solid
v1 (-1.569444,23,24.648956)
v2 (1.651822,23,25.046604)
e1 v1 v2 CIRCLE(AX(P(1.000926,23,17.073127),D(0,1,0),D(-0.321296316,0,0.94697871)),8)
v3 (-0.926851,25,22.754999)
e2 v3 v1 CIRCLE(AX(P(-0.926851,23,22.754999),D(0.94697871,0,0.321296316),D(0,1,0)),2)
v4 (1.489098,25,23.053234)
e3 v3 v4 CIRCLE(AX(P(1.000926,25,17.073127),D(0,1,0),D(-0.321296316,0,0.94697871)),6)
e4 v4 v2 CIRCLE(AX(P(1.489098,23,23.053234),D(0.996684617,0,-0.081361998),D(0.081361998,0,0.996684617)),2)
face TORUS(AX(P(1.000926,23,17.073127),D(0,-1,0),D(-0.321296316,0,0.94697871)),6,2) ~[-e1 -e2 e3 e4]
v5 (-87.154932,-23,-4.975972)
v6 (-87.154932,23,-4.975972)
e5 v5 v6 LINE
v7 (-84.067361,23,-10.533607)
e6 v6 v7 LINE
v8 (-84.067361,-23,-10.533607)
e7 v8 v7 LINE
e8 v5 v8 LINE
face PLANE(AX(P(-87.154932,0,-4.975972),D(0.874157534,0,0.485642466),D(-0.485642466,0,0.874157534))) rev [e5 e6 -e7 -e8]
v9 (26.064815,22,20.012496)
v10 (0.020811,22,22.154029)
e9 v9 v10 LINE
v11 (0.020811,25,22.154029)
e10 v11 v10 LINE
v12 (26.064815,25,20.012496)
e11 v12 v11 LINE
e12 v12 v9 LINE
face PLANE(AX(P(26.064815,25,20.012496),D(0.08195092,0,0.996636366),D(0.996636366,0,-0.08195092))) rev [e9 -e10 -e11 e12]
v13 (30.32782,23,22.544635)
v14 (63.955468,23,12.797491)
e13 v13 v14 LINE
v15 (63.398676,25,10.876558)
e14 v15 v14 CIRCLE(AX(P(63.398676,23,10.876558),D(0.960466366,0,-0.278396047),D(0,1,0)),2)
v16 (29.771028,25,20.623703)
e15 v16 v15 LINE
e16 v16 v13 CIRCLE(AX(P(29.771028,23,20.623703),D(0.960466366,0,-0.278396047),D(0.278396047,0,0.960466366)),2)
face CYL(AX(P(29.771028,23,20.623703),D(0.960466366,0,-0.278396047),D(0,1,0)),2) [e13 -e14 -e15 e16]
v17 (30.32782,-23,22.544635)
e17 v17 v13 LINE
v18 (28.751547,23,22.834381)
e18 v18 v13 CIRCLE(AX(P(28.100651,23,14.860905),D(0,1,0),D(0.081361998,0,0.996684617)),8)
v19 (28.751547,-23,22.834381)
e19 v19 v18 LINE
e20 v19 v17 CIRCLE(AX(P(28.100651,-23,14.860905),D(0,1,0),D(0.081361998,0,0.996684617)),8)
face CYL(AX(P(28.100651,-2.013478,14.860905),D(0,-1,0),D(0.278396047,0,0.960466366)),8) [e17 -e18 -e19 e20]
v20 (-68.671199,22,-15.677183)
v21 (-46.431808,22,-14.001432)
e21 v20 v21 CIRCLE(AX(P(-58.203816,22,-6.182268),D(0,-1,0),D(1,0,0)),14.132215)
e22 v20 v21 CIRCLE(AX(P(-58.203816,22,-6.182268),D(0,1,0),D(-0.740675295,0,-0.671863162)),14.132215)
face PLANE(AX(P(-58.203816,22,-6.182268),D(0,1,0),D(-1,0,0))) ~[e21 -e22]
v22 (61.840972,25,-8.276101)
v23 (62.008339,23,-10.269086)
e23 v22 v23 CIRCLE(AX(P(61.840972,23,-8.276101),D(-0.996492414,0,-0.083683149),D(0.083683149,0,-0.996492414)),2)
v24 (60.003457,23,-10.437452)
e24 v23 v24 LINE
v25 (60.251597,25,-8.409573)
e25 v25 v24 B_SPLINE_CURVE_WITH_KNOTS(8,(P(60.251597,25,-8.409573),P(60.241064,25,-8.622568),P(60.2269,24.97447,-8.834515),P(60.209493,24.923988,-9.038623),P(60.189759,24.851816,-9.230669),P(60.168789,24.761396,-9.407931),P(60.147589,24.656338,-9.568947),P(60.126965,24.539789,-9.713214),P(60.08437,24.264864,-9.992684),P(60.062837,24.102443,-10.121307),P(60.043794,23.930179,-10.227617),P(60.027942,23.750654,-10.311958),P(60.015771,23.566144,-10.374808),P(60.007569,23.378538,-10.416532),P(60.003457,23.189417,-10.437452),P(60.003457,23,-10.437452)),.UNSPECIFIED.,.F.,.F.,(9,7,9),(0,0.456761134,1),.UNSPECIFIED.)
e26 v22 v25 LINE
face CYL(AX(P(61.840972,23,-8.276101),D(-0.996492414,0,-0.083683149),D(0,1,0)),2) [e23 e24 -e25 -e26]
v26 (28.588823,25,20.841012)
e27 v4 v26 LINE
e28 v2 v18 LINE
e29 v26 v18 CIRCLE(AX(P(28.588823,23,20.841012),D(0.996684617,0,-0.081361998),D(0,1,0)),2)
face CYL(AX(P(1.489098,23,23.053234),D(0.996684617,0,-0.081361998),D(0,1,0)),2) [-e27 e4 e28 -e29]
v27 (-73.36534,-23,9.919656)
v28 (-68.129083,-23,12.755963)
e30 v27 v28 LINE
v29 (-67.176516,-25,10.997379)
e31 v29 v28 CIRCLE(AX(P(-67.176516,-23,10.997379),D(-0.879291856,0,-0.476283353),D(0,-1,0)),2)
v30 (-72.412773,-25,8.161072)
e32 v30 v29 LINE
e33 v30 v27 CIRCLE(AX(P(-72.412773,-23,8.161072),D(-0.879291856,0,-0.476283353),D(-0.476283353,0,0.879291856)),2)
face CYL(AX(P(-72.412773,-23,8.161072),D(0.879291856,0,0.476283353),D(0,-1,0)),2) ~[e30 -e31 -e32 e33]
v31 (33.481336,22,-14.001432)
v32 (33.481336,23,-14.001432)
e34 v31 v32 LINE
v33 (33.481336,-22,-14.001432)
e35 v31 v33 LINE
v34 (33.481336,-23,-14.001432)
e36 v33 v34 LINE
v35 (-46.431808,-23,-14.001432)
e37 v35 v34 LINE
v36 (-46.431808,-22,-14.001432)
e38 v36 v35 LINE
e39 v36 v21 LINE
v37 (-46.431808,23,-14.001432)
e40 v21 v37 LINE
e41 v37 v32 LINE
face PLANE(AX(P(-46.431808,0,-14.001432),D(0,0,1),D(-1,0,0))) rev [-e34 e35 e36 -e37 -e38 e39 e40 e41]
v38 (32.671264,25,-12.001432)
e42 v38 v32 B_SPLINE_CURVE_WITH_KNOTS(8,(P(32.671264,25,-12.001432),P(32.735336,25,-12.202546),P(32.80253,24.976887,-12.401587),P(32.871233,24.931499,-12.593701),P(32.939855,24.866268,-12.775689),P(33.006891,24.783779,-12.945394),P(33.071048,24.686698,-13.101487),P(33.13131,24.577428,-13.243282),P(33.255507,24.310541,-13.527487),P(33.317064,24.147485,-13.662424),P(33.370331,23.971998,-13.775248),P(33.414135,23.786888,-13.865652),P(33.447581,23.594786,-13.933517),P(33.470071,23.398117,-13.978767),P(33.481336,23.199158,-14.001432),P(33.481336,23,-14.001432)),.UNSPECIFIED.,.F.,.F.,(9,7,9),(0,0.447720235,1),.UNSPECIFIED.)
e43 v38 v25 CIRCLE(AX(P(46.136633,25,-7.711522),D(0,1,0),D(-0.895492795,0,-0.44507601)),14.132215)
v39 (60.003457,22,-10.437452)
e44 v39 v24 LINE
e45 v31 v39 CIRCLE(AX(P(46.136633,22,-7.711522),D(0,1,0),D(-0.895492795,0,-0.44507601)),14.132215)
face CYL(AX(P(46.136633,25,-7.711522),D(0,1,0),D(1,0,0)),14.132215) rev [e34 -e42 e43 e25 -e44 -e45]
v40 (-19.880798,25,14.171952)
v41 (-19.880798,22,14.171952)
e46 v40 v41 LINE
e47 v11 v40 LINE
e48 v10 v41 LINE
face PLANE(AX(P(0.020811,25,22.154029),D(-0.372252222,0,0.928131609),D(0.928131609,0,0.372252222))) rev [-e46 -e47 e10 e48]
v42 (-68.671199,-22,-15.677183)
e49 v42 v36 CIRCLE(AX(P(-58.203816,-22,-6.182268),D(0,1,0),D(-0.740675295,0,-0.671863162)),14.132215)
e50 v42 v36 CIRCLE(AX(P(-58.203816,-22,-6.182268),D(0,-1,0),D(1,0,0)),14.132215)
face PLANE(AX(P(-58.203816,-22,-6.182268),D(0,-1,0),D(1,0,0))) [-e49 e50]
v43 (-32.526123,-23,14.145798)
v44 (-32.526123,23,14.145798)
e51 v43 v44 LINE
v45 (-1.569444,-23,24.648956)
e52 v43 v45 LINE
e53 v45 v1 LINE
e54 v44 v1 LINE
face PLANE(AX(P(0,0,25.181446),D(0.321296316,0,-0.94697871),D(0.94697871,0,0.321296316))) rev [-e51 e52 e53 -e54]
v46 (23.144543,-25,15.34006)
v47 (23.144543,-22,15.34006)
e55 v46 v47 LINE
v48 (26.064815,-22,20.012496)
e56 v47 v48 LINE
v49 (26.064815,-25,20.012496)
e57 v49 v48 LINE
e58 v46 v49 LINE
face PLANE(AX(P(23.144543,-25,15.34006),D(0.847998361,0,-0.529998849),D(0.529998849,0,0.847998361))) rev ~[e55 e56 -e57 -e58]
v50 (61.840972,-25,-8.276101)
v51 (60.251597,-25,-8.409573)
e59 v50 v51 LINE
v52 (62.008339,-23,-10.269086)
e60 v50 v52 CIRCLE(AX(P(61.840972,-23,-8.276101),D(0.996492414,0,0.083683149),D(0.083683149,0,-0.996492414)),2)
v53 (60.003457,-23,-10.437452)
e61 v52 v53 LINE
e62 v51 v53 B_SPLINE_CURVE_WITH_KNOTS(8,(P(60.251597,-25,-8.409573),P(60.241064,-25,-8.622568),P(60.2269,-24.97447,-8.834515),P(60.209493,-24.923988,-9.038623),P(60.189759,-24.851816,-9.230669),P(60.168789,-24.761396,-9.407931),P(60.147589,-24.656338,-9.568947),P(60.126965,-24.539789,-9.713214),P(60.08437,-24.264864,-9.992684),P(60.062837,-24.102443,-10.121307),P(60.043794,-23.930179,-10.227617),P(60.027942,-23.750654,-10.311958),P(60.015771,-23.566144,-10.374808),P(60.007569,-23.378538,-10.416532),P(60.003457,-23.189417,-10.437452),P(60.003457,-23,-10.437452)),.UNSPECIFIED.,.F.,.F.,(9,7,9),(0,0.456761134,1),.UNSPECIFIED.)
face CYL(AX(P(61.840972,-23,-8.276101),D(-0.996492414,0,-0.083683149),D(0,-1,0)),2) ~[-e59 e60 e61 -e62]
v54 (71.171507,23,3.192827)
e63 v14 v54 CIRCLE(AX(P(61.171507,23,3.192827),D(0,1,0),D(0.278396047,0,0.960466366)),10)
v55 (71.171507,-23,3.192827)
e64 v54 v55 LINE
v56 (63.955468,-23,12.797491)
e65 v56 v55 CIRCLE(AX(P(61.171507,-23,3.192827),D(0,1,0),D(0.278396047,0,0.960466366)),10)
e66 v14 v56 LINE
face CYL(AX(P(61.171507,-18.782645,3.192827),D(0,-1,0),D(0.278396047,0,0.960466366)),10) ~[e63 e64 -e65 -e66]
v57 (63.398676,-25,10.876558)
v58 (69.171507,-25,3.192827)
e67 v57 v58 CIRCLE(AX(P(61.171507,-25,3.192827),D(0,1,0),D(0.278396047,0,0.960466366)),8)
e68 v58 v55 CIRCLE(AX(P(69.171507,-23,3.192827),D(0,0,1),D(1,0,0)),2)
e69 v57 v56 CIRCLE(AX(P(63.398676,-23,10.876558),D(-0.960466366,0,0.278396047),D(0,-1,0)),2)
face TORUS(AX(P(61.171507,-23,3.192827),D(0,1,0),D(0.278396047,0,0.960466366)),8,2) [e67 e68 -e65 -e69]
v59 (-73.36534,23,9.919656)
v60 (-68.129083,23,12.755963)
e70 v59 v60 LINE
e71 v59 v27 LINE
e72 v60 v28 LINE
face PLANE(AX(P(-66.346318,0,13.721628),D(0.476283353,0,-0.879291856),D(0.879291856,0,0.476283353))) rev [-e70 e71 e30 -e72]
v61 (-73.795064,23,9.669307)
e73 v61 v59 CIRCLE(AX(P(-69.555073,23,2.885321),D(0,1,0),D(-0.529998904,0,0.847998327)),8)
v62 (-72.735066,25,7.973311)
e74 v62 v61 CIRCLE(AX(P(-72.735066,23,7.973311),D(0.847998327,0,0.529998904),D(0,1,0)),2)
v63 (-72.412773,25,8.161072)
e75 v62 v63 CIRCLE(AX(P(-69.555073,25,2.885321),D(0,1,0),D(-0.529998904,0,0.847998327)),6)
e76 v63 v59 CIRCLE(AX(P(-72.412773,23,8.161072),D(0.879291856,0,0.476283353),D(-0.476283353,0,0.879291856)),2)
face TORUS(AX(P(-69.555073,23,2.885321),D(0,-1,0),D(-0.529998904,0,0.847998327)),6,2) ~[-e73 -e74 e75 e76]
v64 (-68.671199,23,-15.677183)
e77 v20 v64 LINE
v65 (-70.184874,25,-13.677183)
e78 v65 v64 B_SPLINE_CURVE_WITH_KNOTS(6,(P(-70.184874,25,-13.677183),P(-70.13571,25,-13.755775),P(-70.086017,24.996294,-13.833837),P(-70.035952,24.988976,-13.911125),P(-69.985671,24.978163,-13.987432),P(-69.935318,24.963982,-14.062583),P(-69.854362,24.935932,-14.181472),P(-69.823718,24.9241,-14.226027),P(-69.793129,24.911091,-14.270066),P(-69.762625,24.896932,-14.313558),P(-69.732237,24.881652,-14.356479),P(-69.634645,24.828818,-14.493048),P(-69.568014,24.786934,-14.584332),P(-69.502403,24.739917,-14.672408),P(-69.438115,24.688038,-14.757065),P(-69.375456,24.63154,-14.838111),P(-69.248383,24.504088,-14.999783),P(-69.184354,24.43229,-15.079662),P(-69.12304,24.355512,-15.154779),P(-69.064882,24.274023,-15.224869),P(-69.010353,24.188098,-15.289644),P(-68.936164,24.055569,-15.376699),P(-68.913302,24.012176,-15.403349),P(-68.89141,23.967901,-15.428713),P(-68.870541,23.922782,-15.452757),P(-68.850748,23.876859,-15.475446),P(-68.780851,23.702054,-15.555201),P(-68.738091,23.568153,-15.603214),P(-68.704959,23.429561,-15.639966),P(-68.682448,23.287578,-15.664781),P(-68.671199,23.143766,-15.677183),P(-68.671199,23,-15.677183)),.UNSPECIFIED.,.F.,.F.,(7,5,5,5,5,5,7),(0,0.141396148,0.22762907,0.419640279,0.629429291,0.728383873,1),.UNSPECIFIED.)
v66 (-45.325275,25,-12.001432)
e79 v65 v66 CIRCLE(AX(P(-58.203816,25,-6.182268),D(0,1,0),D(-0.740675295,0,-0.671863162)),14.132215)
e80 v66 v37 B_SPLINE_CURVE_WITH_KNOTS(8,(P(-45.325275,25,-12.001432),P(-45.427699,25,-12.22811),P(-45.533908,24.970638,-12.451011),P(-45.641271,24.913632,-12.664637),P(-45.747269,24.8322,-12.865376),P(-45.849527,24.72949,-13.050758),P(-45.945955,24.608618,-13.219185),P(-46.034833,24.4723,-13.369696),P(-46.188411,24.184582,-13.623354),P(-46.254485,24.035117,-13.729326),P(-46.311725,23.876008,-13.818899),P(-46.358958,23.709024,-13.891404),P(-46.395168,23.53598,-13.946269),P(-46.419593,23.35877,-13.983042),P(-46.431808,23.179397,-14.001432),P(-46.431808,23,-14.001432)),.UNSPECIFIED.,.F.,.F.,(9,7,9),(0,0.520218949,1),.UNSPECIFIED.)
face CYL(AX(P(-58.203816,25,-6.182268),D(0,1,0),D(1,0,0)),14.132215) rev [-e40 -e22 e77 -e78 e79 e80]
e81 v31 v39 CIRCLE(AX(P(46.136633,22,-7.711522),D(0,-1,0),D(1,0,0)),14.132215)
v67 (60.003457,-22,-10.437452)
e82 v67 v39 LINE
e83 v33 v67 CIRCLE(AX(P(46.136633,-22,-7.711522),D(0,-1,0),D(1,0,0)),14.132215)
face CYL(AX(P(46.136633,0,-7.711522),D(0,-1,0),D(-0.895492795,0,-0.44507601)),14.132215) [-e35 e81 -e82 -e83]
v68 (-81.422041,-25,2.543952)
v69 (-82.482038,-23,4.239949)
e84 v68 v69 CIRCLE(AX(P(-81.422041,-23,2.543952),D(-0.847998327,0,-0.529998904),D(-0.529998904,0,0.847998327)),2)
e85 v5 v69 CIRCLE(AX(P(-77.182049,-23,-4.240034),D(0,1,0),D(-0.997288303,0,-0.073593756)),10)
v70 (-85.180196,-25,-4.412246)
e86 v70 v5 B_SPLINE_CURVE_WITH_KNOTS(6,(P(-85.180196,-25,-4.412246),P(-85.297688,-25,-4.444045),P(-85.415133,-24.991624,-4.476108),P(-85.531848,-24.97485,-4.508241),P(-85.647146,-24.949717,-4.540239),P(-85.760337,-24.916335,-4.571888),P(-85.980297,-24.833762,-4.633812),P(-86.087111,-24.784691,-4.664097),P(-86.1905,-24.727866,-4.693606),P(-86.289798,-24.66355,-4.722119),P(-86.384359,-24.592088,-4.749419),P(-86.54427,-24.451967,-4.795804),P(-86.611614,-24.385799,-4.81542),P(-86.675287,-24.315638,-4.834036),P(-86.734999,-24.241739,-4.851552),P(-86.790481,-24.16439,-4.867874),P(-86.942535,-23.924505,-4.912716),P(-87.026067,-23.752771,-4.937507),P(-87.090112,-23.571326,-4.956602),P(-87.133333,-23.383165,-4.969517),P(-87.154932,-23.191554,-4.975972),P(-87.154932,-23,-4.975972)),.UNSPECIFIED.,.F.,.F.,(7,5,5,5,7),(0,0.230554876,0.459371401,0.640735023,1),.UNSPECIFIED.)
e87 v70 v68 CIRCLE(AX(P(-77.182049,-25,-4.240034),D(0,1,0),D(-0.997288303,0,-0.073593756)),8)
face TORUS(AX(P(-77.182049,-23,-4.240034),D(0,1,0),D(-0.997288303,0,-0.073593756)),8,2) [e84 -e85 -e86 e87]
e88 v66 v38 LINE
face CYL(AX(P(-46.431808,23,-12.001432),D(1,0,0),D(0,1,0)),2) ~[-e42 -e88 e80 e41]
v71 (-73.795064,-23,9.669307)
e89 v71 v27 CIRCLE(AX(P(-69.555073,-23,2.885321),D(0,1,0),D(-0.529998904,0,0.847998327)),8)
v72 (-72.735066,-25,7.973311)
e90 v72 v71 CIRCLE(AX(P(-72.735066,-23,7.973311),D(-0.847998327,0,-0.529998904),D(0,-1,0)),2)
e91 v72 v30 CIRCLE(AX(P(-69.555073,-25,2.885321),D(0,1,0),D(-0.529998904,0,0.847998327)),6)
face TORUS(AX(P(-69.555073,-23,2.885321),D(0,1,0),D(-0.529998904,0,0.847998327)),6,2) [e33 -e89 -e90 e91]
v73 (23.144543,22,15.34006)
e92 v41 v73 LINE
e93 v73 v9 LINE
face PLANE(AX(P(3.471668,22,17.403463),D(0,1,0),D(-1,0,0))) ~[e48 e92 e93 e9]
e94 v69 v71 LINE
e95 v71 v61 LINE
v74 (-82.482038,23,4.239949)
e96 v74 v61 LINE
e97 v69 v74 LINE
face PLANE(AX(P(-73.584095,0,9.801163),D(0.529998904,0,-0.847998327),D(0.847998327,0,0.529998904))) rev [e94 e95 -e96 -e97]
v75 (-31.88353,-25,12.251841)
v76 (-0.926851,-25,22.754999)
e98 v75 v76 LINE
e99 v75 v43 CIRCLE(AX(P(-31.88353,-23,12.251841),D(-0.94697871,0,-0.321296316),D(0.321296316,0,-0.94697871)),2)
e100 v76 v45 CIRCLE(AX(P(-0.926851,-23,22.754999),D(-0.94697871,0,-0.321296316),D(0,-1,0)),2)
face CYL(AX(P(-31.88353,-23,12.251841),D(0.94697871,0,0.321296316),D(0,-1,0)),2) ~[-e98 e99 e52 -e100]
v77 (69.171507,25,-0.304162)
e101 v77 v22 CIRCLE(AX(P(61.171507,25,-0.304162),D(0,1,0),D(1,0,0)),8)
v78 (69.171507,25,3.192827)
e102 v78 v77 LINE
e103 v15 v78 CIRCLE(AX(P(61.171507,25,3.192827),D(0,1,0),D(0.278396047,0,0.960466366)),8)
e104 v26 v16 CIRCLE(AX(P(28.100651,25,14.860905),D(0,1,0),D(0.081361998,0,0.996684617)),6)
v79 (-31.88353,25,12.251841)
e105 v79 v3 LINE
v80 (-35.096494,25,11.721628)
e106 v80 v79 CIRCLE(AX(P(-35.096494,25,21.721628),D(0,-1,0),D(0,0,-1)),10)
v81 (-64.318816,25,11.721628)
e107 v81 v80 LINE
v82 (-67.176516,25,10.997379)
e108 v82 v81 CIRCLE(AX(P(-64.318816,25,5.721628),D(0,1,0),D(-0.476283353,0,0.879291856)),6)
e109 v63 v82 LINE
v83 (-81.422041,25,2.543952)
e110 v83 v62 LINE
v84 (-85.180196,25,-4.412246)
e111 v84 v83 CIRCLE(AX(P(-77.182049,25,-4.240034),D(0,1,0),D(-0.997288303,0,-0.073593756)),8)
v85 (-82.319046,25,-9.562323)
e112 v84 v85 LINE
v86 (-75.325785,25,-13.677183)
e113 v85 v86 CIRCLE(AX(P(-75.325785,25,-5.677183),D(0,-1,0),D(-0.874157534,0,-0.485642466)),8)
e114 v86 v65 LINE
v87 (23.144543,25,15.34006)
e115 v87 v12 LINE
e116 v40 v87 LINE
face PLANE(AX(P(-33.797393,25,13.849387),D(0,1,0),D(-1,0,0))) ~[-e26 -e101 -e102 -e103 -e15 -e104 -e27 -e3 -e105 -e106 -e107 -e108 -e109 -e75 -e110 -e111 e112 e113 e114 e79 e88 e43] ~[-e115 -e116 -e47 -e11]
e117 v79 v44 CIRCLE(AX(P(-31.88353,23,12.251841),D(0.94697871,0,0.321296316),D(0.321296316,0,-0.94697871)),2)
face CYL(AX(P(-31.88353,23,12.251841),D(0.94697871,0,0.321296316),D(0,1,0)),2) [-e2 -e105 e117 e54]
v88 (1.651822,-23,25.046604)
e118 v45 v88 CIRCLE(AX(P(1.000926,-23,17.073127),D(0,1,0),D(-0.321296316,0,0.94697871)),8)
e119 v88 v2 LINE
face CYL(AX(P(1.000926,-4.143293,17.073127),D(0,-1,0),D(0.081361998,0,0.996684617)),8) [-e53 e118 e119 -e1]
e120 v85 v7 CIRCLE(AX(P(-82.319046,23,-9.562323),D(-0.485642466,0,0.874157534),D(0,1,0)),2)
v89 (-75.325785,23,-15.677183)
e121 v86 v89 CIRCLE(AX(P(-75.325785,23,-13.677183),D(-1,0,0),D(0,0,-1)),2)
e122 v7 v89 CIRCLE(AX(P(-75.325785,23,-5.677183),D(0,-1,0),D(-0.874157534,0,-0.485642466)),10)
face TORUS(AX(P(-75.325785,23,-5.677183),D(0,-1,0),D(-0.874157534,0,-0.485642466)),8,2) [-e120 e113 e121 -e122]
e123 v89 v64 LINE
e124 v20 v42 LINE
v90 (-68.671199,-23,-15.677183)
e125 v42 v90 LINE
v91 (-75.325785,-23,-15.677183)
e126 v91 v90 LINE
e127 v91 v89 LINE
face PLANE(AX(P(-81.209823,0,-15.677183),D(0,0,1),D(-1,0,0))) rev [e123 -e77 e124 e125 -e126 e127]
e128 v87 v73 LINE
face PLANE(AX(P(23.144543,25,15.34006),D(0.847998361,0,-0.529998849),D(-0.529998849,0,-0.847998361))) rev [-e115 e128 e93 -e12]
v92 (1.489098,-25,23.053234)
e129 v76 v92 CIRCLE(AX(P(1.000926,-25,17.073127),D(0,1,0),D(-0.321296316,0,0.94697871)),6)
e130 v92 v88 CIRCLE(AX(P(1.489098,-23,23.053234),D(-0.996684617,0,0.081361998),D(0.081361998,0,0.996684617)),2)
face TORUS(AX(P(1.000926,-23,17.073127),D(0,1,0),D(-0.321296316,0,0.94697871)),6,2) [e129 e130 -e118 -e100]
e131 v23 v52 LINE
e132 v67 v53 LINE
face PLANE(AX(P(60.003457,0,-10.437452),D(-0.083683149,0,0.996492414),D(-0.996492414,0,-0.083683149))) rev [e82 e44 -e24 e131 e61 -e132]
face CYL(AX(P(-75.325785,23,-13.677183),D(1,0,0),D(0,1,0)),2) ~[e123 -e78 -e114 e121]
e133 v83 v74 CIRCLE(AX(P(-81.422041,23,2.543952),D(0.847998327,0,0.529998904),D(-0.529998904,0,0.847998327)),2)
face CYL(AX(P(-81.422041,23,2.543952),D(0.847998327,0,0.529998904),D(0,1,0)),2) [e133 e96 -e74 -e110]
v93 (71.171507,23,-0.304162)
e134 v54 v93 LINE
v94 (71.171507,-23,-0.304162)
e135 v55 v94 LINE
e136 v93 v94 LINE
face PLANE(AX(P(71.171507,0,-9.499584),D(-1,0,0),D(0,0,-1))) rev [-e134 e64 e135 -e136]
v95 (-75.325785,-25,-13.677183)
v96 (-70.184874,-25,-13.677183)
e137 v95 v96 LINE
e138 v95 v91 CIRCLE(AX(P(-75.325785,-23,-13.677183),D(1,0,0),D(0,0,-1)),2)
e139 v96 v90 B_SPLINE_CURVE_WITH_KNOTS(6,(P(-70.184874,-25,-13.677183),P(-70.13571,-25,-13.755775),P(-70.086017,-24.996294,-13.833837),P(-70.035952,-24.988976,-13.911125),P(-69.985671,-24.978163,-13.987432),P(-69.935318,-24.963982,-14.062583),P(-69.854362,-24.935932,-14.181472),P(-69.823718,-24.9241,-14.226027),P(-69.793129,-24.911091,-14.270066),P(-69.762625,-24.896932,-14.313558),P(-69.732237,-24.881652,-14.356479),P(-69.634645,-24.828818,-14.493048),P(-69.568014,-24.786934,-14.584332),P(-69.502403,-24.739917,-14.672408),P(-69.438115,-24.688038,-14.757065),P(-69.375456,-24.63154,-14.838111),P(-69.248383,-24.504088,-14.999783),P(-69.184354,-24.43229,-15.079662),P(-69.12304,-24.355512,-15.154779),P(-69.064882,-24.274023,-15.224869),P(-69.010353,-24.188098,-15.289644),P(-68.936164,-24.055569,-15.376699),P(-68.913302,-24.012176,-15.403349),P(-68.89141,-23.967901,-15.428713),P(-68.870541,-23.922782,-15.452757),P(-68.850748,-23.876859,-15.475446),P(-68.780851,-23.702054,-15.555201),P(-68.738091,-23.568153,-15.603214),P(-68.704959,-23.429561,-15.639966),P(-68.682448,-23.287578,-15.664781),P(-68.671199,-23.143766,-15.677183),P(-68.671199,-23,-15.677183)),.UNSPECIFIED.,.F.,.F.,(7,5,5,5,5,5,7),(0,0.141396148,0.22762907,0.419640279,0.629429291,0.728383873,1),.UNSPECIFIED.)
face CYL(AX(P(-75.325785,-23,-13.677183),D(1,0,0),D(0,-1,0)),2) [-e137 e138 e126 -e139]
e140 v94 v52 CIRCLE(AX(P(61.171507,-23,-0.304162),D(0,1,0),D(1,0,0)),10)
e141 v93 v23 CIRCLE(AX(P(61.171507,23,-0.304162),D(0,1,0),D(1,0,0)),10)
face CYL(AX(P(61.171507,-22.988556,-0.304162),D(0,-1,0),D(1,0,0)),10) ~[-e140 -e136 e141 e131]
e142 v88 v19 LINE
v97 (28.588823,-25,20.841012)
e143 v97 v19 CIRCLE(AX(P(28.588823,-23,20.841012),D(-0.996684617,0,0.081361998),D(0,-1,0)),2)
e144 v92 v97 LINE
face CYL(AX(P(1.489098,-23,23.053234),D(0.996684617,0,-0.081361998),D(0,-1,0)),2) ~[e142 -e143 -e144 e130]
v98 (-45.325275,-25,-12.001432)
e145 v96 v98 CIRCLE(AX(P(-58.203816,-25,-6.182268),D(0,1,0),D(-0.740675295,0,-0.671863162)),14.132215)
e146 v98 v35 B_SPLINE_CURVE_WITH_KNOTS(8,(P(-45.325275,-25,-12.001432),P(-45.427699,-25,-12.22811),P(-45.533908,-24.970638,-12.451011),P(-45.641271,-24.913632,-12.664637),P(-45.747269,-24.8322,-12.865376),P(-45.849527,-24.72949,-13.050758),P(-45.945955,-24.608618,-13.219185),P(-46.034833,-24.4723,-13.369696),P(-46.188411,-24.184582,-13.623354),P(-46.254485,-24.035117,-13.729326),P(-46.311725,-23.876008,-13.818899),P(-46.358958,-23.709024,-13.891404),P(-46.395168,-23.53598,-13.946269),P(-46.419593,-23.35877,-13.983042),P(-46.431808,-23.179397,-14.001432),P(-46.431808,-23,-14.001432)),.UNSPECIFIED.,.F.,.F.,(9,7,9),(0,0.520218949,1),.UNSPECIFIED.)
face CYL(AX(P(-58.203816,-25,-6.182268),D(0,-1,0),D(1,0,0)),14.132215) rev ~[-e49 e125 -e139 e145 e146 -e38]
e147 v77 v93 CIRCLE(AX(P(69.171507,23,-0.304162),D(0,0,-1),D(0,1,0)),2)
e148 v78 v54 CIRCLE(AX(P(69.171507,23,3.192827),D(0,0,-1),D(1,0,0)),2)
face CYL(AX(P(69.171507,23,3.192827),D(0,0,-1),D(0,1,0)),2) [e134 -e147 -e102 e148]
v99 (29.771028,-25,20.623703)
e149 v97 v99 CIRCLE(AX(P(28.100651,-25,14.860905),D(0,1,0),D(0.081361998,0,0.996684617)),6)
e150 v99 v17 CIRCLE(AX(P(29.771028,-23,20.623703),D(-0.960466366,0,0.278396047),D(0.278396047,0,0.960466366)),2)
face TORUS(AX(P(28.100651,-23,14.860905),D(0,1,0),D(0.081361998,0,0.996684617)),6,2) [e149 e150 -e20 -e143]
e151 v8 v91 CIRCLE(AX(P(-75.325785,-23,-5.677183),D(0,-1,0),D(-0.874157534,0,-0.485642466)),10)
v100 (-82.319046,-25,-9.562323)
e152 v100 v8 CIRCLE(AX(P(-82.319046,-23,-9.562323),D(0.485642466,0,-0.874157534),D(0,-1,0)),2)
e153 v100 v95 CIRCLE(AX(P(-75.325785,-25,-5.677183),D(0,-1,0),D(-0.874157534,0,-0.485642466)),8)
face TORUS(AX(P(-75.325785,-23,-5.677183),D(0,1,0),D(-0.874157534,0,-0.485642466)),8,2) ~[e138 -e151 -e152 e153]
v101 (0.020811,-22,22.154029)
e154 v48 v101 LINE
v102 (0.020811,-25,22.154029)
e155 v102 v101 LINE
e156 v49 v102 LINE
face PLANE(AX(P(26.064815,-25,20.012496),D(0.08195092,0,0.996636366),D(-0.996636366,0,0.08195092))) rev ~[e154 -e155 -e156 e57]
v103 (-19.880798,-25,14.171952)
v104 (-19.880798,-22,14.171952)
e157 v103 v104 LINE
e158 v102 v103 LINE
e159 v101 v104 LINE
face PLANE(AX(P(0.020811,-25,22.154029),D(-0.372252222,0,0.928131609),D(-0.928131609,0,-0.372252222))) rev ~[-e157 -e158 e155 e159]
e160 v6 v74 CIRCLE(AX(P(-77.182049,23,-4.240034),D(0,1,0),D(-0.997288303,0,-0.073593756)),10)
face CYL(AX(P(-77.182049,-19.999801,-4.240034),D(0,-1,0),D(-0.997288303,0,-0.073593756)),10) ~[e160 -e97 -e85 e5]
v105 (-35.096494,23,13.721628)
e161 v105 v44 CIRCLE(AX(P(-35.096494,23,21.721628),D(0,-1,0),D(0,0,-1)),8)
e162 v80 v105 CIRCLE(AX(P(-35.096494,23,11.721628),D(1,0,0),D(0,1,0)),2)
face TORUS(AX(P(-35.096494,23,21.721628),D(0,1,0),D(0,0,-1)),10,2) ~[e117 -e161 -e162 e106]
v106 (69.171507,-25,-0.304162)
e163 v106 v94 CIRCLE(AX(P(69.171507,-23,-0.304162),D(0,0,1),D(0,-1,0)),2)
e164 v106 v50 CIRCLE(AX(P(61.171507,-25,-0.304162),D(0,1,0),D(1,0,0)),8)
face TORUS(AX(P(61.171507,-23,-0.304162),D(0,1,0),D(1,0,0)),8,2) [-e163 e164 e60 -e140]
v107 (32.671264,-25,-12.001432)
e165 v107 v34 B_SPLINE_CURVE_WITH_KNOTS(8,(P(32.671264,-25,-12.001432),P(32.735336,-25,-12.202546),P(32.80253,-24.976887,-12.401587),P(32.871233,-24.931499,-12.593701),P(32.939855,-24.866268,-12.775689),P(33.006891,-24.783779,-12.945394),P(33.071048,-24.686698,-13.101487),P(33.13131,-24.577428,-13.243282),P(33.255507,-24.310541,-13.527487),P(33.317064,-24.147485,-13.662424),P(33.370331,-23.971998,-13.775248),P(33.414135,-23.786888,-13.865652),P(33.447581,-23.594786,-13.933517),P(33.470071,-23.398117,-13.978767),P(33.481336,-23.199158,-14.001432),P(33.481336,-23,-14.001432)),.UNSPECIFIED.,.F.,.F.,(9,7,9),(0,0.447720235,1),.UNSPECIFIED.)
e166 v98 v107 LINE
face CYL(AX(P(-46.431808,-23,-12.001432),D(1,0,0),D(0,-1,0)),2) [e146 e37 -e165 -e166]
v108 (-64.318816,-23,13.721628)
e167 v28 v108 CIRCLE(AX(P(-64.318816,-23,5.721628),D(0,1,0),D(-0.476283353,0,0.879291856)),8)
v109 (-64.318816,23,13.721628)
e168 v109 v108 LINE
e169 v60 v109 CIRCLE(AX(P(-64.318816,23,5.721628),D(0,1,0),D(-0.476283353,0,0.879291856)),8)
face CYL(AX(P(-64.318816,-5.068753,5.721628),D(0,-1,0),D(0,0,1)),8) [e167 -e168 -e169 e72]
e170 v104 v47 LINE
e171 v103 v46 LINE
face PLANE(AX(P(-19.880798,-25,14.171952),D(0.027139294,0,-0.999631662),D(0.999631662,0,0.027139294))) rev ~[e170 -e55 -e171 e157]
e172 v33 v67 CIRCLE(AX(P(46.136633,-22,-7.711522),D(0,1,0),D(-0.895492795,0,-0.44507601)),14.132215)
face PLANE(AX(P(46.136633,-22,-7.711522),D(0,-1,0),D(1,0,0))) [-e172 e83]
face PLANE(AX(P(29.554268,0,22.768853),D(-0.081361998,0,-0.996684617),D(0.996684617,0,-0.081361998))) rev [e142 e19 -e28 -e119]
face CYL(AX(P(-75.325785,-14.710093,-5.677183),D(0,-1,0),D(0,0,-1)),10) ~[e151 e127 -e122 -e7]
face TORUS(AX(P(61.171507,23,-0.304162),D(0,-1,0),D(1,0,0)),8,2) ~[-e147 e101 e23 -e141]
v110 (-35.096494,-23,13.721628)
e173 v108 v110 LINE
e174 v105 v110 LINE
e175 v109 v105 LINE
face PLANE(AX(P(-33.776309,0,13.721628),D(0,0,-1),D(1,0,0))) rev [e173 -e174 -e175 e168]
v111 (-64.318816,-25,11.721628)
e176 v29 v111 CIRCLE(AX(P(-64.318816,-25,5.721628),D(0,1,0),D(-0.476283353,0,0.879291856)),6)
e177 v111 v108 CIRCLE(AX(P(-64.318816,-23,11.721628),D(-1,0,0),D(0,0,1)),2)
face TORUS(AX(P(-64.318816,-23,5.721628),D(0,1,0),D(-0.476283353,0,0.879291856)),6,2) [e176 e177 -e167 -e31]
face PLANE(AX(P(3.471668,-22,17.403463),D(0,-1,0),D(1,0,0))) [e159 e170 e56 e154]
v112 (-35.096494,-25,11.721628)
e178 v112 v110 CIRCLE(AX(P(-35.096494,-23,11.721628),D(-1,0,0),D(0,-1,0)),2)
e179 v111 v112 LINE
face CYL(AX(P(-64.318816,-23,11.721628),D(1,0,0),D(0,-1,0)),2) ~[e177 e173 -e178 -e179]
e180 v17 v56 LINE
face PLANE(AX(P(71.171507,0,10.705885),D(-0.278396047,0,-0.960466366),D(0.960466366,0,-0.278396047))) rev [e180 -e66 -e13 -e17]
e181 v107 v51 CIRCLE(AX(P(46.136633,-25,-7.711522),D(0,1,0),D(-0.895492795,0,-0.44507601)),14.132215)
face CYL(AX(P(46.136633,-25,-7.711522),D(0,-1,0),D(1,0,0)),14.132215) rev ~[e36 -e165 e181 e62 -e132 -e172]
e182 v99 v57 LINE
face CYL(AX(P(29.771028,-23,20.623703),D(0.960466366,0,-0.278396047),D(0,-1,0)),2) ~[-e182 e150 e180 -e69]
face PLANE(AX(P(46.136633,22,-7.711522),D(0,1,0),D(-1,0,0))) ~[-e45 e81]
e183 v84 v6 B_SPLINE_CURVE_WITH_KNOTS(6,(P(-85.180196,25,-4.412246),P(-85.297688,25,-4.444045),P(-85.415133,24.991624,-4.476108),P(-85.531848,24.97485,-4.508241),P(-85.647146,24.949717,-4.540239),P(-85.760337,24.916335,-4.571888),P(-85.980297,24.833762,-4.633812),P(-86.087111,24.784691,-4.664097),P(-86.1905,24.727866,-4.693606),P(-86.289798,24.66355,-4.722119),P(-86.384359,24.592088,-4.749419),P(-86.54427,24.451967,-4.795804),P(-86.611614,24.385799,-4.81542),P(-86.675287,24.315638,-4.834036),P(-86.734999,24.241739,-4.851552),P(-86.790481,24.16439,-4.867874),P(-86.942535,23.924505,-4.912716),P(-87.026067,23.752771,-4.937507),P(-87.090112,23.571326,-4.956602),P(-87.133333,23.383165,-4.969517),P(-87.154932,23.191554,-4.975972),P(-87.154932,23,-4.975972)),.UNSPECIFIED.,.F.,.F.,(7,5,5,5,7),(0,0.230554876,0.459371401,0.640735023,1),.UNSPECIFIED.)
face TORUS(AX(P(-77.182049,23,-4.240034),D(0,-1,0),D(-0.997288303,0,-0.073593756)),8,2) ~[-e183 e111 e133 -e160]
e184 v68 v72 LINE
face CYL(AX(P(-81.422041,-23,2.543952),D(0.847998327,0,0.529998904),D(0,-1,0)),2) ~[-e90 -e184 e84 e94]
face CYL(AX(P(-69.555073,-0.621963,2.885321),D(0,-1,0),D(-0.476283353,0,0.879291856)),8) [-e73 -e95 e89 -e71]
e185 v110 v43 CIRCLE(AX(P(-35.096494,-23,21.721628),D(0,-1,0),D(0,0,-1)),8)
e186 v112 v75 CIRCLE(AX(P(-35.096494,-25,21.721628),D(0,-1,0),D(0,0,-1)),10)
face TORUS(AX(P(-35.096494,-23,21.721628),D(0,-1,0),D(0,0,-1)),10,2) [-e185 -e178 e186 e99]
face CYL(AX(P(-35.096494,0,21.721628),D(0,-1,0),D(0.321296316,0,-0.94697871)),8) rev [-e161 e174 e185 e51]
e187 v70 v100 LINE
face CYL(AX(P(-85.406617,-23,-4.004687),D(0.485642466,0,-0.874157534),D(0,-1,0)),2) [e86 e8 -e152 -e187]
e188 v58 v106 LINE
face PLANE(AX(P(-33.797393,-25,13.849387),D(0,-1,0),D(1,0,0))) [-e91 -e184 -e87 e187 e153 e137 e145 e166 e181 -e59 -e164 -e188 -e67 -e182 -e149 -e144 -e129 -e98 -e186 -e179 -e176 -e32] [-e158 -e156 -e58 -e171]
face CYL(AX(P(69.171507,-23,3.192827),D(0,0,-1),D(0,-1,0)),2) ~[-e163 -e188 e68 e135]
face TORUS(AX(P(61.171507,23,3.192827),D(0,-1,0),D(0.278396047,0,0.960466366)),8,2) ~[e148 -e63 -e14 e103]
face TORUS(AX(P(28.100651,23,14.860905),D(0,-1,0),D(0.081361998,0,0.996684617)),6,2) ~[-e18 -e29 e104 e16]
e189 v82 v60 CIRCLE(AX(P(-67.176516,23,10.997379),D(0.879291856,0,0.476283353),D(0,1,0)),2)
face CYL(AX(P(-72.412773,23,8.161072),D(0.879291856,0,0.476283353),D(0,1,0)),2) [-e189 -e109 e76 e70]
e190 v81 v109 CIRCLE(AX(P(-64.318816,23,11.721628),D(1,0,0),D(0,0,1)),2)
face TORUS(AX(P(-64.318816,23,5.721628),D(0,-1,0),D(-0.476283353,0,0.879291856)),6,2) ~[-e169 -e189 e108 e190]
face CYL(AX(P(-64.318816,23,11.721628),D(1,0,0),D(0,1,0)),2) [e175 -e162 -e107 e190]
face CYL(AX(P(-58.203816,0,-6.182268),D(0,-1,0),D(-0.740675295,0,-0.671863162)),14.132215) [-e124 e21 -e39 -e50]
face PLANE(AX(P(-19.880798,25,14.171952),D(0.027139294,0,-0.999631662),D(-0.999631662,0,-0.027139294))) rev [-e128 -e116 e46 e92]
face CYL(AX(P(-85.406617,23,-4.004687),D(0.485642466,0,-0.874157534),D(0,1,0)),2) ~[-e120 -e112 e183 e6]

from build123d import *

# Parameters (mm, degrees)
F1_DEPTH    = 25
F2_T1_DEPTH = 25
F2_T3_DEPTH = 33.2865856195
F2_T5_DEPTH = 35.1375068729
F2_T7_DEPTH = 26.2439265081
F2_T9_DEPTH = 29.0269565503
F3_T1_DEPTH = 64.9996021944
F3_T3_DEPTH = 54.4201853444
F3_T5_DEPTH = 62.5652900515
F3_T7_DEPTH = 70.9771112235
F4_R        = 14.1322148091
F5_DEPTH    = 3
F6_R        = 2


# Not quite as in the source:
# - a fillet or chamfer that OpenCascade refuses, or shapes differently, is made with other operations: its cross-section is extruded or revolved along the edge and cut away or added


with BuildPart() as f1:
    # F0 (on Front) → F1 (new body)
    with BuildSketch(Plane.XZ):
        with BuildLine():
            Line((-81.2098225326, -15.6771827859), (-68.6711987798, -15.6771827859))
            ThreePointArc((-68.6711987798, -15.6771827859), (-57.1419560716, -20.274533801), (-46.4318082669, -14.0014318744))
            Line((-46.4318082669, -14.0014318744), (33.4813362922, -14.0014318744))
            ThreePointArc((33.4813362922, -14.0014318744), (48.0187694937, -21.717844135), (60.0034566781, -10.4374516171))
            Line((60.0034566781, -10.4374516171), (71.1715072393, -9.4995843247))
            Line((71.1715072393, -9.4995843247), (71.1715072393, 10.7058854774))
            Line((71.1715072393, 10.7058854774), (29.5542683452, 22.7688532323))
            Line((29.5542683452, 22.7688532323), (0, 25.1814462245))
            Line((0, 25.1814462245), (-33.7763093412, 13.7216281146))
            Line((-33.7763093412, 13.7216281146), (-66.3463175297, 13.7216281146))
            Line((-66.3463175297, 13.7216281146), (-73.5840946436, 9.8011633381))
            Line((-73.5840946436, 9.8011633381), (-89.2659574747, 0))
            Line((-89.2659574747, 0), (-87.1549323201, -4.9759717658))
            Line((-87.1549323201, -4.9759717658), (-81.2098225326, -15.6771827859))
        make_face()
    extrude(amount=F1_DEPTH)

    # F2: fillet of radius 8 on 5 edges, made by hand

    # F2_s2 → F2_t1 (join)
    with BuildSketch(Plane.XZ):
        with BuildLine():
            ThreePointArc((-32.5261230106, 14.1457984349), (-33.7939263524, 13.8283829823), (-35.0964935411, 13.7216281146))
            Line((-35.0964935411, 13.7216281146), (-33.7763093412, 13.7216281146))
            Line((-33.7763093412, 13.7216281146), (-32.5261230106, 14.1457984349))
        make_face()
    extrude(amount=F2_T1_DEPTH)

    # F2_s4 → F2_t3 (cut)
    with BuildSketch(Plane.XZ.offset(-4.1432928098)):
        with BuildLine():
            ThreePointArc((1.6518224825, 25.0466035919), (0.0208109602, 25.012860503), (-1.569444032, 24.6489563376))
            Line((-1.569444032, 24.6489563376), (0, 25.1814462245))
            Line((0, 25.1814462245), (1.6518224825, 25.0466035919))
        make_face()
    extrude(amount=F2_T3_DEPTH, mode=Mode.SUBTRACT)

    # F2_s6 → F2_t5 (cut)
    with BuildSketch(Plane.XZ.offset(-5.0687534365)):
        with BuildLine():
            ThreePointArc((-64.3188161551, 13.7216281146), (-66.284181416, 13.4764549593), (-68.1290829763, 12.7559629624))
            Line((-68.1290829763, 12.7559629624), (-66.3463175297, 13.7216281146))
            Line((-66.3463175297, 13.7216281146), (-64.3188161551, 13.7216281146))
        make_face()
    extrude(amount=F2_T5_DEPTH, mode=Mode.SUBTRACT)

    # F2_s8 → F2_t7 (cut)
    with BuildSketch(Plane.XZ.offset(-0.6219632541)):
        with BuildLine():
            ThreePointArc((-73.365339754, 9.9196556357), (-73.5821478307, 9.7978216209), (-73.7950641631, 9.669307401))
            Line((-73.7950641631, 9.669307401), (-73.5840946436, 9.8011633381))
            Line((-73.5840946436, 9.8011633381), (-73.365339754, 9.9196556357))
        make_face()
    extrude(amount=F2_T7_DEPTH, mode=Mode.SUBTRACT)

    # F2_s10 → F2_t9 (cut)
    with BuildSketch(Plane.XZ.offset(-2.0134782752)):
        with BuildLine():
            ThreePointArc((30.3278196103, 22.544635475), (29.5469574945, 22.7290808385), (28.751547216, 22.8343814784))
            Line((28.751547216, 22.8343814784), (29.5542683452, 22.7688532323))
            Line((29.5542683452, 22.7688532323), (30.3278196103, 22.544635475))
        make_face()
    extrude(amount=F2_T9_DEPTH, mode=Mode.SUBTRACT)

    # F3: fillet of radius 10 on 4 edges, made by hand

    # F3_s2 → F3_t1 (cut)
    with BuildSketch(Plane.XZ.offset(-19.9998010972)):
        with BuildLine():
            ThreePointArc((-87.1549323201, -4.9759717658), (-86.1010433194, 0.2823042988), (-82.4820383293, 4.239949063))
            Line((-82.4820383293, 4.239949063), (-89.2659574747, 0))
            Line((-89.2659574747, 0), (-87.1549323201, -4.9759717658))
        make_face()
    extrude(amount=F3_T1_DEPTH, mode=Mode.SUBTRACT)

    # F3_s4 → F3_t3 (cut)
    with BuildSketch(Plane.XZ.offset(-14.7100926722)):
        with BuildLine():
            ThreePointArc((-75.3257854638, -15.6771827859), (-80.3970650538, -14.2958905382), (-84.0673608071, -10.5336074498))
            Line((-84.0673608071, -10.5336074498), (-81.2098225326, -15.6771827859))
            Line((-81.2098225326, -15.6771827859), (-75.3257854638, -15.6771827859))
        make_face()
    extrude(amount=F3_T3_DEPTH, mode=Mode.SUBTRACT)

    # F3_s6 → F3_t5 (cut)
    with BuildSketch(Plane.XZ.offset(-18.7826450258)):
        with BuildLine():
            ThreePointArc((63.9554677121, 12.7974911304), (69.1664933159, 9.1995068855), (71.1715072393, 3.1928274671))
            Line((71.1715072393, 3.1928274671), (71.1715072393, 10.7058854774))
            Line((71.1715072393, 10.7058854774), (63.9554677121, 12.7974911304))
        make_face()
    extrude(amount=F3_T5_DEPTH, mode=Mode.SUBTRACT)

    # F3_s8 → F3_t7 (cut)
    with BuildSketch(Plane.XZ.offset(-22.9885556118)):
        with BuildLine():
            ThreePointArc((71.1715072393, -0.30416208), (68.532496131, -7.0729021797), (62.0083387319, -10.2690862168))
            Line((62.0083387319, -10.2690862168), (71.1715072393, -9.4995843247))
            Line((71.1715072393, -9.4995843247), (71.1715072393, -0.30416208))
        make_face()
    extrude(amount=F3_T7_DEPTH, mode=Mode.SUBTRACT)

    # F4 (on face) → F5 (cut)
    with BuildSketch(Plane.XZ.offset(25)):
        Polygon((0.0208109602, 22.1540294588), (-19.880797714, 14.1719523817), (23.1445431709, 15.3400599957), (26.0648149997, 20.0124960393), align=None)
        with Locations((-58.2038164139, -6.1822682619)):
            Circle(F4_R)
        with Locations((46.1366328286, -7.7115220987)):
            Circle(F4_R)
    extrude(amount=-F5_DEPTH, mode=Mode.SUBTRACT)

    # F6
    f6_edges = [f1.edges().sort_by_distance(p)[0] for p in [
        (-71.998492, -25, -15.677183),
        (-86.101043, -25, 0.282304),
        (-78.138551, -25, 6.954628),
        (-6.475236, -25, -14.001432),
        (-80.397065, -25, -14.295891),
        (-85.611147, -25, -7.75479),
        (-73.582148, -25, 9.797822),
        (-70.747211, -25, 11.337809),
        (-66.284181, -25, 13.476455),
        (-49.707655, -25, 13.721628),
        (-33.793926, -25, 13.828383),
        (-17.047784, -25, 19.397377),
        (0.020811, -25, 25.012861),
        (15.201685, -25, 23.940493),
        (29.546957, -25, 22.729081),
        (47.141644, -25, 17.671063),
        (69.166493, -25, 9.199507),
        (71.171507, -25, 1.444333),
        (68.532496, -25, -7.072902),
        (61.005898, -25, -10.353269),
    ]]
    fillet(f6_edges, radius=F6_R)

    # F7: F1 across plane


with BuildPart() as f1_1:
    add(f1.part)
    add(f1.part.mirror(Plane.XZ))


solid = f1_1.part
